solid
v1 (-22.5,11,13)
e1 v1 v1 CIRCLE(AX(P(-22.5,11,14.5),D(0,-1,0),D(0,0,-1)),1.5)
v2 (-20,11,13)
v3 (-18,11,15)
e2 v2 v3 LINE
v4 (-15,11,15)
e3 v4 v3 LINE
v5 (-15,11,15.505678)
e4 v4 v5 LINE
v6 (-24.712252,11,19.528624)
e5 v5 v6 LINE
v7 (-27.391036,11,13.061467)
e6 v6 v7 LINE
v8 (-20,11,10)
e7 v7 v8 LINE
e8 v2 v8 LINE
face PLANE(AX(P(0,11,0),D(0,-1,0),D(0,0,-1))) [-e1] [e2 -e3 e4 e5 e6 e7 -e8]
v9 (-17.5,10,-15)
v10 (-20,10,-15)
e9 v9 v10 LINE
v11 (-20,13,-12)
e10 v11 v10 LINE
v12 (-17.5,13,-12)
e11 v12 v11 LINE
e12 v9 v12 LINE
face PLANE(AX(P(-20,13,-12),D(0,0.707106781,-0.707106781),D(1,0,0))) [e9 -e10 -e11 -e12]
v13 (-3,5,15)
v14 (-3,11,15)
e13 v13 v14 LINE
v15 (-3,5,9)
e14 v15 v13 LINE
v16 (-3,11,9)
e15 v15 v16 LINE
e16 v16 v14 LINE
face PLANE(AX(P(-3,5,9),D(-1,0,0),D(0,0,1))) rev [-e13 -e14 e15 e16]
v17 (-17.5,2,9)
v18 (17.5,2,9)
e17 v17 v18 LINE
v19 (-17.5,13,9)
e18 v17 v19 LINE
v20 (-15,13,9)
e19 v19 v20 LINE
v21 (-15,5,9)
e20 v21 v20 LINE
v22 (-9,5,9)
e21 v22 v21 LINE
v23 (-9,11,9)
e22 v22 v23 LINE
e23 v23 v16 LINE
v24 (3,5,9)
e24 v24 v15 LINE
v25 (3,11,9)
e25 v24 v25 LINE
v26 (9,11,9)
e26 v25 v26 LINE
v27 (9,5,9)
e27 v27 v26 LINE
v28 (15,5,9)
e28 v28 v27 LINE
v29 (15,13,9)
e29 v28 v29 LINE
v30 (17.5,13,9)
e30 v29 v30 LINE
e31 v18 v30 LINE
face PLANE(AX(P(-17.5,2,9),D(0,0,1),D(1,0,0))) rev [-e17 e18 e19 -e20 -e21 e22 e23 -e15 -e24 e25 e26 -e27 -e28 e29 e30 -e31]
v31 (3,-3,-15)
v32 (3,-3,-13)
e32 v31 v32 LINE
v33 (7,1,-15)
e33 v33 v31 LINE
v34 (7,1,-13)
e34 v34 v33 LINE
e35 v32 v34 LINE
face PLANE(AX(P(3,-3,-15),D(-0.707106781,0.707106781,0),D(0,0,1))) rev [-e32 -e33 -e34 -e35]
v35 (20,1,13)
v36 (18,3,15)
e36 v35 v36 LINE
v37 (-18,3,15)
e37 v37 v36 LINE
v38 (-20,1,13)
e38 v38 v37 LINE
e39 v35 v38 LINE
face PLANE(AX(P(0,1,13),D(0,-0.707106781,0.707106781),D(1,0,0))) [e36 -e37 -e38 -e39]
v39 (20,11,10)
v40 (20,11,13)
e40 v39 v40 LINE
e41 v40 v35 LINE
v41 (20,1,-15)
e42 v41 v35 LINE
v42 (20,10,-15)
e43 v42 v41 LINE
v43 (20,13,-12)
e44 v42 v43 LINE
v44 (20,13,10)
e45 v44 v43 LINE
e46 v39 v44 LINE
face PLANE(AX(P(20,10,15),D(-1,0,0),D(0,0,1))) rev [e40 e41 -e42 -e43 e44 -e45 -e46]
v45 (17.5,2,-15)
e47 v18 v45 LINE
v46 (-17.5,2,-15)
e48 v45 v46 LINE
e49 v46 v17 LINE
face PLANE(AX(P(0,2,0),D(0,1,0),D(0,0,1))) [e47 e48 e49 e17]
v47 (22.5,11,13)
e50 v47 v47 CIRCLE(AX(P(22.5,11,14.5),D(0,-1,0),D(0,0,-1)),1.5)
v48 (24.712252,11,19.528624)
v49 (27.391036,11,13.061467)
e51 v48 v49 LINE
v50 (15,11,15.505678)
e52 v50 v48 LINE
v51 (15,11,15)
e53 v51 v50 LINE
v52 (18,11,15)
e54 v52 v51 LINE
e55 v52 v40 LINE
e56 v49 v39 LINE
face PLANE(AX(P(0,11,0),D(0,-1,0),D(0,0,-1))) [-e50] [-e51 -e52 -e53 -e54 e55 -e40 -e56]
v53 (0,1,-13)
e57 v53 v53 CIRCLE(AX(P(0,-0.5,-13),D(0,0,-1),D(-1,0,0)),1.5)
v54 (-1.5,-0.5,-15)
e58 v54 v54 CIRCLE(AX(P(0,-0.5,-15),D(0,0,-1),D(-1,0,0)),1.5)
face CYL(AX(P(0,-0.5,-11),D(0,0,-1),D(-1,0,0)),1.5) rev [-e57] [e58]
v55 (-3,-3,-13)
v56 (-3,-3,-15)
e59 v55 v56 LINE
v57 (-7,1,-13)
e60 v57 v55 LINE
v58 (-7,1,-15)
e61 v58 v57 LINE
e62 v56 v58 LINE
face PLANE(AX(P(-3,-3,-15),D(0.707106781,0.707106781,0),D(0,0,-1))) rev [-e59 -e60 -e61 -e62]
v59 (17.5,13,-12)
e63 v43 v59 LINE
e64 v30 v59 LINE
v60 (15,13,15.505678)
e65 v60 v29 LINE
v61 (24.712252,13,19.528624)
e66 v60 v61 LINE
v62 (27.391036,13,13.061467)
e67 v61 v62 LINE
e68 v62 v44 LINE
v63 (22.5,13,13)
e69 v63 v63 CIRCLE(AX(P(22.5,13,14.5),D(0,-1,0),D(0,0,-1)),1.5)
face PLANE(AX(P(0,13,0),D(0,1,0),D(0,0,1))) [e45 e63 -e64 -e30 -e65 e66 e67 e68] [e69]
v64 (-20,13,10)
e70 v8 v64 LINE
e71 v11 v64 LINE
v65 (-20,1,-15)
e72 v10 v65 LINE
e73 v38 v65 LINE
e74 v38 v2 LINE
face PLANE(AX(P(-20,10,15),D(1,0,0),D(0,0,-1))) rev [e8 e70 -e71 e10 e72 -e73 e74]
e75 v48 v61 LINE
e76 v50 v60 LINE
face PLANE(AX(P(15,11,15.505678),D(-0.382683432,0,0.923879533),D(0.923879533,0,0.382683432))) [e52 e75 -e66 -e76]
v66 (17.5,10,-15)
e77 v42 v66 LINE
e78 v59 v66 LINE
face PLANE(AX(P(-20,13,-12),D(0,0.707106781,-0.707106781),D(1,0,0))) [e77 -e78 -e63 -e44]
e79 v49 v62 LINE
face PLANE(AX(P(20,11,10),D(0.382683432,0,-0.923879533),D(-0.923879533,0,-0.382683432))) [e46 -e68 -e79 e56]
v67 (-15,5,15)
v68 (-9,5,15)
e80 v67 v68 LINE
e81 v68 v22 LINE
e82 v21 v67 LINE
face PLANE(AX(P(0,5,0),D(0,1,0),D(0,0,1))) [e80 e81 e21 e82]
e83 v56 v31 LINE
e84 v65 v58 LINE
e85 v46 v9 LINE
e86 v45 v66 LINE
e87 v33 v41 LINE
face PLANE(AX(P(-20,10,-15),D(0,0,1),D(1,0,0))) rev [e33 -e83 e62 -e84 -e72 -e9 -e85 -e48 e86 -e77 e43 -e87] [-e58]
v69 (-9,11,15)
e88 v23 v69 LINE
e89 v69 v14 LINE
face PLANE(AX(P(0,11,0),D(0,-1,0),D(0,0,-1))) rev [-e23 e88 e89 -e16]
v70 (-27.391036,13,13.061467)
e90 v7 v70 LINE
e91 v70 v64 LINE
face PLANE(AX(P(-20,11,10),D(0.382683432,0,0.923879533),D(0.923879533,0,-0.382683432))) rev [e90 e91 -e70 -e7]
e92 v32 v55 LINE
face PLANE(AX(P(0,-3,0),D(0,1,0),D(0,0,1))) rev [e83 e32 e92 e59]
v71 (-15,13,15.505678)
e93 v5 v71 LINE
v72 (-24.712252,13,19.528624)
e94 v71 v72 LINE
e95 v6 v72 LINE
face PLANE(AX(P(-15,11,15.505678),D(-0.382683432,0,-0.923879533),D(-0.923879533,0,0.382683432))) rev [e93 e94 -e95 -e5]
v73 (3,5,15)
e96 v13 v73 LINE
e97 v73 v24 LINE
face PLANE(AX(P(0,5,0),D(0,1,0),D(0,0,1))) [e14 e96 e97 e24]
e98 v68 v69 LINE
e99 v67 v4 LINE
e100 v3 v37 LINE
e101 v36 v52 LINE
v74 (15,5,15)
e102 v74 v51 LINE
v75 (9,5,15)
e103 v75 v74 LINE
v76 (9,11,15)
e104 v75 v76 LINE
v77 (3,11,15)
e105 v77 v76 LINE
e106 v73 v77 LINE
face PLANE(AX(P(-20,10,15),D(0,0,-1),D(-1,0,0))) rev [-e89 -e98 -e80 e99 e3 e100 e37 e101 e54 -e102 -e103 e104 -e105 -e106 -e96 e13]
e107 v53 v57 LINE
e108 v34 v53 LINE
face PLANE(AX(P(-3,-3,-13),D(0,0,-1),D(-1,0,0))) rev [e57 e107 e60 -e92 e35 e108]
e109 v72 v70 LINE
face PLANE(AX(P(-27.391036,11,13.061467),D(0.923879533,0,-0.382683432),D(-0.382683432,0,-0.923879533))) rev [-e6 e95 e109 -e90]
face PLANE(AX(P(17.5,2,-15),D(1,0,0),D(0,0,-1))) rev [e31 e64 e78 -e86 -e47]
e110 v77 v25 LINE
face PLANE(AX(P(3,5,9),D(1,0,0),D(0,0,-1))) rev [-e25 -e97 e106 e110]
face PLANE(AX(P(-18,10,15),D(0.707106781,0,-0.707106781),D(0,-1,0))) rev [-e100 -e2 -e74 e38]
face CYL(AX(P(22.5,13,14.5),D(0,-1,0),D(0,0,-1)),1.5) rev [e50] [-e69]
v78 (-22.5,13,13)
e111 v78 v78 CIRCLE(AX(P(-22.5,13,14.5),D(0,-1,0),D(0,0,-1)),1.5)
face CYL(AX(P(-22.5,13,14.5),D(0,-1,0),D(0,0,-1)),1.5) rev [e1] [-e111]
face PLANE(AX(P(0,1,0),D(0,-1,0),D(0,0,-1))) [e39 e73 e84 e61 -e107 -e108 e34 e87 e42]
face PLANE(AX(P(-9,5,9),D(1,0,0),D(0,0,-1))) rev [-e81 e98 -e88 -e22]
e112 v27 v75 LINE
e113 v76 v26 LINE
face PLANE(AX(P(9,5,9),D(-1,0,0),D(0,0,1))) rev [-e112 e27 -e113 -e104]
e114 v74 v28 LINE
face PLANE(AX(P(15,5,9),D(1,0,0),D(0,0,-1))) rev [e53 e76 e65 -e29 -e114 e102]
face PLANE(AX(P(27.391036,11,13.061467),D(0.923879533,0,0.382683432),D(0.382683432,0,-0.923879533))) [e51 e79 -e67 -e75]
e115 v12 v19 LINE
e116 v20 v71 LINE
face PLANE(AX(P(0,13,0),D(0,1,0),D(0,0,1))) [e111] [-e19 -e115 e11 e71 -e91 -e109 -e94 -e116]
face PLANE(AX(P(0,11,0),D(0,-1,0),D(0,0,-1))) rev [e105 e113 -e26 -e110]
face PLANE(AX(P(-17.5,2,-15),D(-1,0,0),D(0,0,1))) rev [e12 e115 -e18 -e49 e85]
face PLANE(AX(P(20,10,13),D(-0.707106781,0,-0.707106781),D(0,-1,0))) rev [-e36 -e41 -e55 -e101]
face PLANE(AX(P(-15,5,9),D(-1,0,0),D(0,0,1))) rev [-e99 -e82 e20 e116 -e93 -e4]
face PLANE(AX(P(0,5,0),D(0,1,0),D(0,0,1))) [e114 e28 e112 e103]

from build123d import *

# Parameters (mm, degrees)
SKETCH1_W           = 40
SKETCH1_H           = 30
BOSS_EXTRUDE1_DEPTH = 10
SKETCH5_W           = 40
SKETCH5_H           = 27
BOSS_EXTRUDE2_DEPTH = 3
SKETCH2_W           = 11
SKETCH2_H           = 24
CUT_EXTRUDE1_DEPTH  = 11
SKETCH4_W           = 6
SKETCH4_H           = 6
CUT_EXTRUDE2_DEPTH  = 8
SKETCH6_W           = 18
SKETCH6_H           = 16
CUT_EXTRUDE3_DEPTH  = 2
CHAMFER2_SIZE       = 3
BOSS_EXTRUDE3_DEPTH = 2
SKETCH9_R           = 1.5
CUT_EXTRUDE5_DEPTH  = 2
SKETCH11_W          = 40
SKETCH11_H          = 30
CUT_EXTRUDE6_DEPTH  = 1
CHAMFER3_SIZE       = 2
SKETCH14_W          = 6
SKETCH14_H          = 2
BOSS_EXTRUDE4_DEPTH = 4
SKETCH15_R          = 1.5
CUT_EXTRUDE7_DEPTH  = 4
CHAMFER7_SIZE       = 4
SKETCH16_W          = 13
SKETCH16_H          = 6.5
CUT_EXTRUDE8_DEPTH  = 3
SKETCH17_W          = 35
SKETCH17_H          = 24
CUT_EXTRUDE9_DEPTH  = 11


with BuildPart() as part:
    # Sketch1 → Boss-Extrude1 (new body)
    with BuildSketch(Plane(origin=(0, 0, 0), x_dir=(1, 0, 0), z_dir=(0, 1, 0))):
        Rectangle(SKETCH1_W, SKETCH1_H)
    extrude(amount=BOSS_EXTRUDE1_DEPTH)

    # Sketch5 → Boss-Extrude2 (add)
    with BuildSketch(Plane(origin=(0, 10, 0), x_dir=(1, 0, 0), z_dir=(0, 1, 0))):
        with Locations((0, -1.5)):
            Rectangle(SKETCH5_W, SKETCH5_H)
    extrude(amount=BOSS_EXTRUDE2_DEPTH)

    # Sketch2 → Cut-Extrude1 (cut)
    with BuildSketch(Plane(origin=(0, 13, 0), x_dir=(1, 0, 0), z_dir=(0, 1, 0))):
        with Locations((-12, 3)):
            Rectangle(SKETCH2_W, SKETCH2_H)
        with Locations((0, 3)):
            Rectangle(SKETCH2_W, SKETCH2_H)
        with Locations((12, 3)):
            Rectangle(SKETCH2_W, SKETCH2_H)
    extrude(amount=-CUT_EXTRUDE1_DEPTH, mode=Mode.SUBTRACT)

    # Sketch4 → Cut-Extrude2 (cut)
    with BuildSketch(Plane(origin=(0, 13, 0), x_dir=(1, 0, 0), z_dir=(0, 1, 0))):
        with Locations((-12, -12)):
            Rectangle(SKETCH4_W, SKETCH4_H)
        with Locations((0, -12)):
            Rectangle(SKETCH4_W, SKETCH4_H)
        with Locations((12, -12)):
            Rectangle(SKETCH4_W, SKETCH4_H)
    extrude(amount=-CUT_EXTRUDE2_DEPTH, mode=Mode.SUBTRACT)

    # Sketch6 → Cut-Extrude3 (cut)
    with BuildSketch(Plane(origin=(0, 13, 0), x_dir=(1, 0, 0), z_dir=(0, 1, 0))):
        with Locations((0, -7)):
            Rectangle(SKETCH6_W, SKETCH6_H)
    extrude(amount=-CUT_EXTRUDE3_DEPTH, mode=Mode.SUBTRACT)

    # Chamfer2
    chamfer2_edges = [part.edges().sort_by_distance(p)[0] for p in [
        (18.75, 10, -12),
        (6, 10, -12),
        (-6, 10, -12),
        (-18.75, 10, -12),
    ]]
    chamfer(chamfer2_edges, length=CHAMFER2_SIZE - 0.0001)  # a hair under: the kernel refuses the full size

    # Sketch8 → Boss-Extrude3 (add)
    with BuildSketch(Plane(origin=(0, 13, 0), x_dir=(1, 0, 0), z_dir=(0, 1, 0))):
        Polygon((20, -10), (27.39103626, -13.061467459), (24.712252234, -19.528624186), (15, -15.50567759), (15, -15), (17.5, -9), align=None)
    boss_extrude3 = extrude(amount=-BOSS_EXTRUDE3_DEPTH)

    # Mirror1: Boss-Extrude3 across plane
    add(boss_extrude3.mirror(Plane(origin=(0, 0, 0), x_dir=(0, 0, 1), z_dir=(1, 0, 0))))

    # Sketch9 → Cut-Extrude5 (cut)
    with BuildSketch(Plane.XZ.offset(-11)):
        with Locations(Location((-22.5, 14.5, 0), (0, 0, 270))):
            Circle(SKETCH9_R)
        with Locations(Location((22.5, 14.5, 0), (0, 0, 270))):
            Circle(SKETCH9_R)
    extrude(amount=-CUT_EXTRUDE5_DEPTH, mode=Mode.SUBTRACT)

    # Sketch11 → Cut-Extrude6 (cut)
    with BuildSketch(Plane.XZ):
        Rectangle(SKETCH11_W, SKETCH11_H)
    extrude(amount=-CUT_EXTRUDE6_DEPTH, mode=Mode.SUBTRACT)

    # Chamfer3
    chamfer3_edges = [part.edges().sort_by_distance(p)[0] for p in [
        (20, 6, 15),
        (-20, 6, 15),
        (0, 1, 15),
    ]]
    chamfer(chamfer3_edges, length=CHAMFER3_SIZE)

    # Sketch14 → Boss-Extrude4 (add)
    with BuildSketch(Plane.XZ.offset(-1)):
        with Locations((0, -14)):
            Rectangle(SKETCH14_W, SKETCH14_H)
    extrude(amount=BOSS_EXTRUDE4_DEPTH)

    # Sketch15 → Cut-Extrude7 (cut)
    with BuildSketch(Plane(origin=(0, 0, -15), x_dir=(-1, 0, 0), z_dir=(0, 0, -1))):
        with Locations((0, -0.5)):
            Circle(SKETCH15_R)
    extrude(amount=-CUT_EXTRUDE7_DEPTH, mode=Mode.SUBTRACT)

    # Chamfer7
    chamfer7_edges = [part.edges().sort_by_distance(p)[0] for p in [
        (3, 1, -14),
        (-3, 1, -14),
    ]]
    chamfer(chamfer7_edges, length=CHAMFER7_SIZE - 0.0001)  # a hair under: the kernel refuses the full size

    # Sketch16 → Cut-Extrude8 (cut)
    with BuildSketch(Plane(origin=(0, 13, 0), x_dir=(1, 0, 0), z_dir=(0, 1, 0))):
        with Locations((0, 11.75)):
            Rectangle(SKETCH16_W, SKETCH16_H)
    extrude(amount=-CUT_EXTRUDE8_DEPTH, mode=Mode.SUBTRACT)

    # Sketch17 → Cut-Extrude9 (cut)
    with BuildSketch(Plane(origin=(0, 13, 0), x_dir=(1, 0, 0), z_dir=(0, 1, 0))):
        with Locations((0, 3)):
            Rectangle(SKETCH17_W, SKETCH17_H)
    extrude(amount=-CUT_EXTRUDE9_DEPTH, mode=Mode.SUBTRACT)


solid = part.part
